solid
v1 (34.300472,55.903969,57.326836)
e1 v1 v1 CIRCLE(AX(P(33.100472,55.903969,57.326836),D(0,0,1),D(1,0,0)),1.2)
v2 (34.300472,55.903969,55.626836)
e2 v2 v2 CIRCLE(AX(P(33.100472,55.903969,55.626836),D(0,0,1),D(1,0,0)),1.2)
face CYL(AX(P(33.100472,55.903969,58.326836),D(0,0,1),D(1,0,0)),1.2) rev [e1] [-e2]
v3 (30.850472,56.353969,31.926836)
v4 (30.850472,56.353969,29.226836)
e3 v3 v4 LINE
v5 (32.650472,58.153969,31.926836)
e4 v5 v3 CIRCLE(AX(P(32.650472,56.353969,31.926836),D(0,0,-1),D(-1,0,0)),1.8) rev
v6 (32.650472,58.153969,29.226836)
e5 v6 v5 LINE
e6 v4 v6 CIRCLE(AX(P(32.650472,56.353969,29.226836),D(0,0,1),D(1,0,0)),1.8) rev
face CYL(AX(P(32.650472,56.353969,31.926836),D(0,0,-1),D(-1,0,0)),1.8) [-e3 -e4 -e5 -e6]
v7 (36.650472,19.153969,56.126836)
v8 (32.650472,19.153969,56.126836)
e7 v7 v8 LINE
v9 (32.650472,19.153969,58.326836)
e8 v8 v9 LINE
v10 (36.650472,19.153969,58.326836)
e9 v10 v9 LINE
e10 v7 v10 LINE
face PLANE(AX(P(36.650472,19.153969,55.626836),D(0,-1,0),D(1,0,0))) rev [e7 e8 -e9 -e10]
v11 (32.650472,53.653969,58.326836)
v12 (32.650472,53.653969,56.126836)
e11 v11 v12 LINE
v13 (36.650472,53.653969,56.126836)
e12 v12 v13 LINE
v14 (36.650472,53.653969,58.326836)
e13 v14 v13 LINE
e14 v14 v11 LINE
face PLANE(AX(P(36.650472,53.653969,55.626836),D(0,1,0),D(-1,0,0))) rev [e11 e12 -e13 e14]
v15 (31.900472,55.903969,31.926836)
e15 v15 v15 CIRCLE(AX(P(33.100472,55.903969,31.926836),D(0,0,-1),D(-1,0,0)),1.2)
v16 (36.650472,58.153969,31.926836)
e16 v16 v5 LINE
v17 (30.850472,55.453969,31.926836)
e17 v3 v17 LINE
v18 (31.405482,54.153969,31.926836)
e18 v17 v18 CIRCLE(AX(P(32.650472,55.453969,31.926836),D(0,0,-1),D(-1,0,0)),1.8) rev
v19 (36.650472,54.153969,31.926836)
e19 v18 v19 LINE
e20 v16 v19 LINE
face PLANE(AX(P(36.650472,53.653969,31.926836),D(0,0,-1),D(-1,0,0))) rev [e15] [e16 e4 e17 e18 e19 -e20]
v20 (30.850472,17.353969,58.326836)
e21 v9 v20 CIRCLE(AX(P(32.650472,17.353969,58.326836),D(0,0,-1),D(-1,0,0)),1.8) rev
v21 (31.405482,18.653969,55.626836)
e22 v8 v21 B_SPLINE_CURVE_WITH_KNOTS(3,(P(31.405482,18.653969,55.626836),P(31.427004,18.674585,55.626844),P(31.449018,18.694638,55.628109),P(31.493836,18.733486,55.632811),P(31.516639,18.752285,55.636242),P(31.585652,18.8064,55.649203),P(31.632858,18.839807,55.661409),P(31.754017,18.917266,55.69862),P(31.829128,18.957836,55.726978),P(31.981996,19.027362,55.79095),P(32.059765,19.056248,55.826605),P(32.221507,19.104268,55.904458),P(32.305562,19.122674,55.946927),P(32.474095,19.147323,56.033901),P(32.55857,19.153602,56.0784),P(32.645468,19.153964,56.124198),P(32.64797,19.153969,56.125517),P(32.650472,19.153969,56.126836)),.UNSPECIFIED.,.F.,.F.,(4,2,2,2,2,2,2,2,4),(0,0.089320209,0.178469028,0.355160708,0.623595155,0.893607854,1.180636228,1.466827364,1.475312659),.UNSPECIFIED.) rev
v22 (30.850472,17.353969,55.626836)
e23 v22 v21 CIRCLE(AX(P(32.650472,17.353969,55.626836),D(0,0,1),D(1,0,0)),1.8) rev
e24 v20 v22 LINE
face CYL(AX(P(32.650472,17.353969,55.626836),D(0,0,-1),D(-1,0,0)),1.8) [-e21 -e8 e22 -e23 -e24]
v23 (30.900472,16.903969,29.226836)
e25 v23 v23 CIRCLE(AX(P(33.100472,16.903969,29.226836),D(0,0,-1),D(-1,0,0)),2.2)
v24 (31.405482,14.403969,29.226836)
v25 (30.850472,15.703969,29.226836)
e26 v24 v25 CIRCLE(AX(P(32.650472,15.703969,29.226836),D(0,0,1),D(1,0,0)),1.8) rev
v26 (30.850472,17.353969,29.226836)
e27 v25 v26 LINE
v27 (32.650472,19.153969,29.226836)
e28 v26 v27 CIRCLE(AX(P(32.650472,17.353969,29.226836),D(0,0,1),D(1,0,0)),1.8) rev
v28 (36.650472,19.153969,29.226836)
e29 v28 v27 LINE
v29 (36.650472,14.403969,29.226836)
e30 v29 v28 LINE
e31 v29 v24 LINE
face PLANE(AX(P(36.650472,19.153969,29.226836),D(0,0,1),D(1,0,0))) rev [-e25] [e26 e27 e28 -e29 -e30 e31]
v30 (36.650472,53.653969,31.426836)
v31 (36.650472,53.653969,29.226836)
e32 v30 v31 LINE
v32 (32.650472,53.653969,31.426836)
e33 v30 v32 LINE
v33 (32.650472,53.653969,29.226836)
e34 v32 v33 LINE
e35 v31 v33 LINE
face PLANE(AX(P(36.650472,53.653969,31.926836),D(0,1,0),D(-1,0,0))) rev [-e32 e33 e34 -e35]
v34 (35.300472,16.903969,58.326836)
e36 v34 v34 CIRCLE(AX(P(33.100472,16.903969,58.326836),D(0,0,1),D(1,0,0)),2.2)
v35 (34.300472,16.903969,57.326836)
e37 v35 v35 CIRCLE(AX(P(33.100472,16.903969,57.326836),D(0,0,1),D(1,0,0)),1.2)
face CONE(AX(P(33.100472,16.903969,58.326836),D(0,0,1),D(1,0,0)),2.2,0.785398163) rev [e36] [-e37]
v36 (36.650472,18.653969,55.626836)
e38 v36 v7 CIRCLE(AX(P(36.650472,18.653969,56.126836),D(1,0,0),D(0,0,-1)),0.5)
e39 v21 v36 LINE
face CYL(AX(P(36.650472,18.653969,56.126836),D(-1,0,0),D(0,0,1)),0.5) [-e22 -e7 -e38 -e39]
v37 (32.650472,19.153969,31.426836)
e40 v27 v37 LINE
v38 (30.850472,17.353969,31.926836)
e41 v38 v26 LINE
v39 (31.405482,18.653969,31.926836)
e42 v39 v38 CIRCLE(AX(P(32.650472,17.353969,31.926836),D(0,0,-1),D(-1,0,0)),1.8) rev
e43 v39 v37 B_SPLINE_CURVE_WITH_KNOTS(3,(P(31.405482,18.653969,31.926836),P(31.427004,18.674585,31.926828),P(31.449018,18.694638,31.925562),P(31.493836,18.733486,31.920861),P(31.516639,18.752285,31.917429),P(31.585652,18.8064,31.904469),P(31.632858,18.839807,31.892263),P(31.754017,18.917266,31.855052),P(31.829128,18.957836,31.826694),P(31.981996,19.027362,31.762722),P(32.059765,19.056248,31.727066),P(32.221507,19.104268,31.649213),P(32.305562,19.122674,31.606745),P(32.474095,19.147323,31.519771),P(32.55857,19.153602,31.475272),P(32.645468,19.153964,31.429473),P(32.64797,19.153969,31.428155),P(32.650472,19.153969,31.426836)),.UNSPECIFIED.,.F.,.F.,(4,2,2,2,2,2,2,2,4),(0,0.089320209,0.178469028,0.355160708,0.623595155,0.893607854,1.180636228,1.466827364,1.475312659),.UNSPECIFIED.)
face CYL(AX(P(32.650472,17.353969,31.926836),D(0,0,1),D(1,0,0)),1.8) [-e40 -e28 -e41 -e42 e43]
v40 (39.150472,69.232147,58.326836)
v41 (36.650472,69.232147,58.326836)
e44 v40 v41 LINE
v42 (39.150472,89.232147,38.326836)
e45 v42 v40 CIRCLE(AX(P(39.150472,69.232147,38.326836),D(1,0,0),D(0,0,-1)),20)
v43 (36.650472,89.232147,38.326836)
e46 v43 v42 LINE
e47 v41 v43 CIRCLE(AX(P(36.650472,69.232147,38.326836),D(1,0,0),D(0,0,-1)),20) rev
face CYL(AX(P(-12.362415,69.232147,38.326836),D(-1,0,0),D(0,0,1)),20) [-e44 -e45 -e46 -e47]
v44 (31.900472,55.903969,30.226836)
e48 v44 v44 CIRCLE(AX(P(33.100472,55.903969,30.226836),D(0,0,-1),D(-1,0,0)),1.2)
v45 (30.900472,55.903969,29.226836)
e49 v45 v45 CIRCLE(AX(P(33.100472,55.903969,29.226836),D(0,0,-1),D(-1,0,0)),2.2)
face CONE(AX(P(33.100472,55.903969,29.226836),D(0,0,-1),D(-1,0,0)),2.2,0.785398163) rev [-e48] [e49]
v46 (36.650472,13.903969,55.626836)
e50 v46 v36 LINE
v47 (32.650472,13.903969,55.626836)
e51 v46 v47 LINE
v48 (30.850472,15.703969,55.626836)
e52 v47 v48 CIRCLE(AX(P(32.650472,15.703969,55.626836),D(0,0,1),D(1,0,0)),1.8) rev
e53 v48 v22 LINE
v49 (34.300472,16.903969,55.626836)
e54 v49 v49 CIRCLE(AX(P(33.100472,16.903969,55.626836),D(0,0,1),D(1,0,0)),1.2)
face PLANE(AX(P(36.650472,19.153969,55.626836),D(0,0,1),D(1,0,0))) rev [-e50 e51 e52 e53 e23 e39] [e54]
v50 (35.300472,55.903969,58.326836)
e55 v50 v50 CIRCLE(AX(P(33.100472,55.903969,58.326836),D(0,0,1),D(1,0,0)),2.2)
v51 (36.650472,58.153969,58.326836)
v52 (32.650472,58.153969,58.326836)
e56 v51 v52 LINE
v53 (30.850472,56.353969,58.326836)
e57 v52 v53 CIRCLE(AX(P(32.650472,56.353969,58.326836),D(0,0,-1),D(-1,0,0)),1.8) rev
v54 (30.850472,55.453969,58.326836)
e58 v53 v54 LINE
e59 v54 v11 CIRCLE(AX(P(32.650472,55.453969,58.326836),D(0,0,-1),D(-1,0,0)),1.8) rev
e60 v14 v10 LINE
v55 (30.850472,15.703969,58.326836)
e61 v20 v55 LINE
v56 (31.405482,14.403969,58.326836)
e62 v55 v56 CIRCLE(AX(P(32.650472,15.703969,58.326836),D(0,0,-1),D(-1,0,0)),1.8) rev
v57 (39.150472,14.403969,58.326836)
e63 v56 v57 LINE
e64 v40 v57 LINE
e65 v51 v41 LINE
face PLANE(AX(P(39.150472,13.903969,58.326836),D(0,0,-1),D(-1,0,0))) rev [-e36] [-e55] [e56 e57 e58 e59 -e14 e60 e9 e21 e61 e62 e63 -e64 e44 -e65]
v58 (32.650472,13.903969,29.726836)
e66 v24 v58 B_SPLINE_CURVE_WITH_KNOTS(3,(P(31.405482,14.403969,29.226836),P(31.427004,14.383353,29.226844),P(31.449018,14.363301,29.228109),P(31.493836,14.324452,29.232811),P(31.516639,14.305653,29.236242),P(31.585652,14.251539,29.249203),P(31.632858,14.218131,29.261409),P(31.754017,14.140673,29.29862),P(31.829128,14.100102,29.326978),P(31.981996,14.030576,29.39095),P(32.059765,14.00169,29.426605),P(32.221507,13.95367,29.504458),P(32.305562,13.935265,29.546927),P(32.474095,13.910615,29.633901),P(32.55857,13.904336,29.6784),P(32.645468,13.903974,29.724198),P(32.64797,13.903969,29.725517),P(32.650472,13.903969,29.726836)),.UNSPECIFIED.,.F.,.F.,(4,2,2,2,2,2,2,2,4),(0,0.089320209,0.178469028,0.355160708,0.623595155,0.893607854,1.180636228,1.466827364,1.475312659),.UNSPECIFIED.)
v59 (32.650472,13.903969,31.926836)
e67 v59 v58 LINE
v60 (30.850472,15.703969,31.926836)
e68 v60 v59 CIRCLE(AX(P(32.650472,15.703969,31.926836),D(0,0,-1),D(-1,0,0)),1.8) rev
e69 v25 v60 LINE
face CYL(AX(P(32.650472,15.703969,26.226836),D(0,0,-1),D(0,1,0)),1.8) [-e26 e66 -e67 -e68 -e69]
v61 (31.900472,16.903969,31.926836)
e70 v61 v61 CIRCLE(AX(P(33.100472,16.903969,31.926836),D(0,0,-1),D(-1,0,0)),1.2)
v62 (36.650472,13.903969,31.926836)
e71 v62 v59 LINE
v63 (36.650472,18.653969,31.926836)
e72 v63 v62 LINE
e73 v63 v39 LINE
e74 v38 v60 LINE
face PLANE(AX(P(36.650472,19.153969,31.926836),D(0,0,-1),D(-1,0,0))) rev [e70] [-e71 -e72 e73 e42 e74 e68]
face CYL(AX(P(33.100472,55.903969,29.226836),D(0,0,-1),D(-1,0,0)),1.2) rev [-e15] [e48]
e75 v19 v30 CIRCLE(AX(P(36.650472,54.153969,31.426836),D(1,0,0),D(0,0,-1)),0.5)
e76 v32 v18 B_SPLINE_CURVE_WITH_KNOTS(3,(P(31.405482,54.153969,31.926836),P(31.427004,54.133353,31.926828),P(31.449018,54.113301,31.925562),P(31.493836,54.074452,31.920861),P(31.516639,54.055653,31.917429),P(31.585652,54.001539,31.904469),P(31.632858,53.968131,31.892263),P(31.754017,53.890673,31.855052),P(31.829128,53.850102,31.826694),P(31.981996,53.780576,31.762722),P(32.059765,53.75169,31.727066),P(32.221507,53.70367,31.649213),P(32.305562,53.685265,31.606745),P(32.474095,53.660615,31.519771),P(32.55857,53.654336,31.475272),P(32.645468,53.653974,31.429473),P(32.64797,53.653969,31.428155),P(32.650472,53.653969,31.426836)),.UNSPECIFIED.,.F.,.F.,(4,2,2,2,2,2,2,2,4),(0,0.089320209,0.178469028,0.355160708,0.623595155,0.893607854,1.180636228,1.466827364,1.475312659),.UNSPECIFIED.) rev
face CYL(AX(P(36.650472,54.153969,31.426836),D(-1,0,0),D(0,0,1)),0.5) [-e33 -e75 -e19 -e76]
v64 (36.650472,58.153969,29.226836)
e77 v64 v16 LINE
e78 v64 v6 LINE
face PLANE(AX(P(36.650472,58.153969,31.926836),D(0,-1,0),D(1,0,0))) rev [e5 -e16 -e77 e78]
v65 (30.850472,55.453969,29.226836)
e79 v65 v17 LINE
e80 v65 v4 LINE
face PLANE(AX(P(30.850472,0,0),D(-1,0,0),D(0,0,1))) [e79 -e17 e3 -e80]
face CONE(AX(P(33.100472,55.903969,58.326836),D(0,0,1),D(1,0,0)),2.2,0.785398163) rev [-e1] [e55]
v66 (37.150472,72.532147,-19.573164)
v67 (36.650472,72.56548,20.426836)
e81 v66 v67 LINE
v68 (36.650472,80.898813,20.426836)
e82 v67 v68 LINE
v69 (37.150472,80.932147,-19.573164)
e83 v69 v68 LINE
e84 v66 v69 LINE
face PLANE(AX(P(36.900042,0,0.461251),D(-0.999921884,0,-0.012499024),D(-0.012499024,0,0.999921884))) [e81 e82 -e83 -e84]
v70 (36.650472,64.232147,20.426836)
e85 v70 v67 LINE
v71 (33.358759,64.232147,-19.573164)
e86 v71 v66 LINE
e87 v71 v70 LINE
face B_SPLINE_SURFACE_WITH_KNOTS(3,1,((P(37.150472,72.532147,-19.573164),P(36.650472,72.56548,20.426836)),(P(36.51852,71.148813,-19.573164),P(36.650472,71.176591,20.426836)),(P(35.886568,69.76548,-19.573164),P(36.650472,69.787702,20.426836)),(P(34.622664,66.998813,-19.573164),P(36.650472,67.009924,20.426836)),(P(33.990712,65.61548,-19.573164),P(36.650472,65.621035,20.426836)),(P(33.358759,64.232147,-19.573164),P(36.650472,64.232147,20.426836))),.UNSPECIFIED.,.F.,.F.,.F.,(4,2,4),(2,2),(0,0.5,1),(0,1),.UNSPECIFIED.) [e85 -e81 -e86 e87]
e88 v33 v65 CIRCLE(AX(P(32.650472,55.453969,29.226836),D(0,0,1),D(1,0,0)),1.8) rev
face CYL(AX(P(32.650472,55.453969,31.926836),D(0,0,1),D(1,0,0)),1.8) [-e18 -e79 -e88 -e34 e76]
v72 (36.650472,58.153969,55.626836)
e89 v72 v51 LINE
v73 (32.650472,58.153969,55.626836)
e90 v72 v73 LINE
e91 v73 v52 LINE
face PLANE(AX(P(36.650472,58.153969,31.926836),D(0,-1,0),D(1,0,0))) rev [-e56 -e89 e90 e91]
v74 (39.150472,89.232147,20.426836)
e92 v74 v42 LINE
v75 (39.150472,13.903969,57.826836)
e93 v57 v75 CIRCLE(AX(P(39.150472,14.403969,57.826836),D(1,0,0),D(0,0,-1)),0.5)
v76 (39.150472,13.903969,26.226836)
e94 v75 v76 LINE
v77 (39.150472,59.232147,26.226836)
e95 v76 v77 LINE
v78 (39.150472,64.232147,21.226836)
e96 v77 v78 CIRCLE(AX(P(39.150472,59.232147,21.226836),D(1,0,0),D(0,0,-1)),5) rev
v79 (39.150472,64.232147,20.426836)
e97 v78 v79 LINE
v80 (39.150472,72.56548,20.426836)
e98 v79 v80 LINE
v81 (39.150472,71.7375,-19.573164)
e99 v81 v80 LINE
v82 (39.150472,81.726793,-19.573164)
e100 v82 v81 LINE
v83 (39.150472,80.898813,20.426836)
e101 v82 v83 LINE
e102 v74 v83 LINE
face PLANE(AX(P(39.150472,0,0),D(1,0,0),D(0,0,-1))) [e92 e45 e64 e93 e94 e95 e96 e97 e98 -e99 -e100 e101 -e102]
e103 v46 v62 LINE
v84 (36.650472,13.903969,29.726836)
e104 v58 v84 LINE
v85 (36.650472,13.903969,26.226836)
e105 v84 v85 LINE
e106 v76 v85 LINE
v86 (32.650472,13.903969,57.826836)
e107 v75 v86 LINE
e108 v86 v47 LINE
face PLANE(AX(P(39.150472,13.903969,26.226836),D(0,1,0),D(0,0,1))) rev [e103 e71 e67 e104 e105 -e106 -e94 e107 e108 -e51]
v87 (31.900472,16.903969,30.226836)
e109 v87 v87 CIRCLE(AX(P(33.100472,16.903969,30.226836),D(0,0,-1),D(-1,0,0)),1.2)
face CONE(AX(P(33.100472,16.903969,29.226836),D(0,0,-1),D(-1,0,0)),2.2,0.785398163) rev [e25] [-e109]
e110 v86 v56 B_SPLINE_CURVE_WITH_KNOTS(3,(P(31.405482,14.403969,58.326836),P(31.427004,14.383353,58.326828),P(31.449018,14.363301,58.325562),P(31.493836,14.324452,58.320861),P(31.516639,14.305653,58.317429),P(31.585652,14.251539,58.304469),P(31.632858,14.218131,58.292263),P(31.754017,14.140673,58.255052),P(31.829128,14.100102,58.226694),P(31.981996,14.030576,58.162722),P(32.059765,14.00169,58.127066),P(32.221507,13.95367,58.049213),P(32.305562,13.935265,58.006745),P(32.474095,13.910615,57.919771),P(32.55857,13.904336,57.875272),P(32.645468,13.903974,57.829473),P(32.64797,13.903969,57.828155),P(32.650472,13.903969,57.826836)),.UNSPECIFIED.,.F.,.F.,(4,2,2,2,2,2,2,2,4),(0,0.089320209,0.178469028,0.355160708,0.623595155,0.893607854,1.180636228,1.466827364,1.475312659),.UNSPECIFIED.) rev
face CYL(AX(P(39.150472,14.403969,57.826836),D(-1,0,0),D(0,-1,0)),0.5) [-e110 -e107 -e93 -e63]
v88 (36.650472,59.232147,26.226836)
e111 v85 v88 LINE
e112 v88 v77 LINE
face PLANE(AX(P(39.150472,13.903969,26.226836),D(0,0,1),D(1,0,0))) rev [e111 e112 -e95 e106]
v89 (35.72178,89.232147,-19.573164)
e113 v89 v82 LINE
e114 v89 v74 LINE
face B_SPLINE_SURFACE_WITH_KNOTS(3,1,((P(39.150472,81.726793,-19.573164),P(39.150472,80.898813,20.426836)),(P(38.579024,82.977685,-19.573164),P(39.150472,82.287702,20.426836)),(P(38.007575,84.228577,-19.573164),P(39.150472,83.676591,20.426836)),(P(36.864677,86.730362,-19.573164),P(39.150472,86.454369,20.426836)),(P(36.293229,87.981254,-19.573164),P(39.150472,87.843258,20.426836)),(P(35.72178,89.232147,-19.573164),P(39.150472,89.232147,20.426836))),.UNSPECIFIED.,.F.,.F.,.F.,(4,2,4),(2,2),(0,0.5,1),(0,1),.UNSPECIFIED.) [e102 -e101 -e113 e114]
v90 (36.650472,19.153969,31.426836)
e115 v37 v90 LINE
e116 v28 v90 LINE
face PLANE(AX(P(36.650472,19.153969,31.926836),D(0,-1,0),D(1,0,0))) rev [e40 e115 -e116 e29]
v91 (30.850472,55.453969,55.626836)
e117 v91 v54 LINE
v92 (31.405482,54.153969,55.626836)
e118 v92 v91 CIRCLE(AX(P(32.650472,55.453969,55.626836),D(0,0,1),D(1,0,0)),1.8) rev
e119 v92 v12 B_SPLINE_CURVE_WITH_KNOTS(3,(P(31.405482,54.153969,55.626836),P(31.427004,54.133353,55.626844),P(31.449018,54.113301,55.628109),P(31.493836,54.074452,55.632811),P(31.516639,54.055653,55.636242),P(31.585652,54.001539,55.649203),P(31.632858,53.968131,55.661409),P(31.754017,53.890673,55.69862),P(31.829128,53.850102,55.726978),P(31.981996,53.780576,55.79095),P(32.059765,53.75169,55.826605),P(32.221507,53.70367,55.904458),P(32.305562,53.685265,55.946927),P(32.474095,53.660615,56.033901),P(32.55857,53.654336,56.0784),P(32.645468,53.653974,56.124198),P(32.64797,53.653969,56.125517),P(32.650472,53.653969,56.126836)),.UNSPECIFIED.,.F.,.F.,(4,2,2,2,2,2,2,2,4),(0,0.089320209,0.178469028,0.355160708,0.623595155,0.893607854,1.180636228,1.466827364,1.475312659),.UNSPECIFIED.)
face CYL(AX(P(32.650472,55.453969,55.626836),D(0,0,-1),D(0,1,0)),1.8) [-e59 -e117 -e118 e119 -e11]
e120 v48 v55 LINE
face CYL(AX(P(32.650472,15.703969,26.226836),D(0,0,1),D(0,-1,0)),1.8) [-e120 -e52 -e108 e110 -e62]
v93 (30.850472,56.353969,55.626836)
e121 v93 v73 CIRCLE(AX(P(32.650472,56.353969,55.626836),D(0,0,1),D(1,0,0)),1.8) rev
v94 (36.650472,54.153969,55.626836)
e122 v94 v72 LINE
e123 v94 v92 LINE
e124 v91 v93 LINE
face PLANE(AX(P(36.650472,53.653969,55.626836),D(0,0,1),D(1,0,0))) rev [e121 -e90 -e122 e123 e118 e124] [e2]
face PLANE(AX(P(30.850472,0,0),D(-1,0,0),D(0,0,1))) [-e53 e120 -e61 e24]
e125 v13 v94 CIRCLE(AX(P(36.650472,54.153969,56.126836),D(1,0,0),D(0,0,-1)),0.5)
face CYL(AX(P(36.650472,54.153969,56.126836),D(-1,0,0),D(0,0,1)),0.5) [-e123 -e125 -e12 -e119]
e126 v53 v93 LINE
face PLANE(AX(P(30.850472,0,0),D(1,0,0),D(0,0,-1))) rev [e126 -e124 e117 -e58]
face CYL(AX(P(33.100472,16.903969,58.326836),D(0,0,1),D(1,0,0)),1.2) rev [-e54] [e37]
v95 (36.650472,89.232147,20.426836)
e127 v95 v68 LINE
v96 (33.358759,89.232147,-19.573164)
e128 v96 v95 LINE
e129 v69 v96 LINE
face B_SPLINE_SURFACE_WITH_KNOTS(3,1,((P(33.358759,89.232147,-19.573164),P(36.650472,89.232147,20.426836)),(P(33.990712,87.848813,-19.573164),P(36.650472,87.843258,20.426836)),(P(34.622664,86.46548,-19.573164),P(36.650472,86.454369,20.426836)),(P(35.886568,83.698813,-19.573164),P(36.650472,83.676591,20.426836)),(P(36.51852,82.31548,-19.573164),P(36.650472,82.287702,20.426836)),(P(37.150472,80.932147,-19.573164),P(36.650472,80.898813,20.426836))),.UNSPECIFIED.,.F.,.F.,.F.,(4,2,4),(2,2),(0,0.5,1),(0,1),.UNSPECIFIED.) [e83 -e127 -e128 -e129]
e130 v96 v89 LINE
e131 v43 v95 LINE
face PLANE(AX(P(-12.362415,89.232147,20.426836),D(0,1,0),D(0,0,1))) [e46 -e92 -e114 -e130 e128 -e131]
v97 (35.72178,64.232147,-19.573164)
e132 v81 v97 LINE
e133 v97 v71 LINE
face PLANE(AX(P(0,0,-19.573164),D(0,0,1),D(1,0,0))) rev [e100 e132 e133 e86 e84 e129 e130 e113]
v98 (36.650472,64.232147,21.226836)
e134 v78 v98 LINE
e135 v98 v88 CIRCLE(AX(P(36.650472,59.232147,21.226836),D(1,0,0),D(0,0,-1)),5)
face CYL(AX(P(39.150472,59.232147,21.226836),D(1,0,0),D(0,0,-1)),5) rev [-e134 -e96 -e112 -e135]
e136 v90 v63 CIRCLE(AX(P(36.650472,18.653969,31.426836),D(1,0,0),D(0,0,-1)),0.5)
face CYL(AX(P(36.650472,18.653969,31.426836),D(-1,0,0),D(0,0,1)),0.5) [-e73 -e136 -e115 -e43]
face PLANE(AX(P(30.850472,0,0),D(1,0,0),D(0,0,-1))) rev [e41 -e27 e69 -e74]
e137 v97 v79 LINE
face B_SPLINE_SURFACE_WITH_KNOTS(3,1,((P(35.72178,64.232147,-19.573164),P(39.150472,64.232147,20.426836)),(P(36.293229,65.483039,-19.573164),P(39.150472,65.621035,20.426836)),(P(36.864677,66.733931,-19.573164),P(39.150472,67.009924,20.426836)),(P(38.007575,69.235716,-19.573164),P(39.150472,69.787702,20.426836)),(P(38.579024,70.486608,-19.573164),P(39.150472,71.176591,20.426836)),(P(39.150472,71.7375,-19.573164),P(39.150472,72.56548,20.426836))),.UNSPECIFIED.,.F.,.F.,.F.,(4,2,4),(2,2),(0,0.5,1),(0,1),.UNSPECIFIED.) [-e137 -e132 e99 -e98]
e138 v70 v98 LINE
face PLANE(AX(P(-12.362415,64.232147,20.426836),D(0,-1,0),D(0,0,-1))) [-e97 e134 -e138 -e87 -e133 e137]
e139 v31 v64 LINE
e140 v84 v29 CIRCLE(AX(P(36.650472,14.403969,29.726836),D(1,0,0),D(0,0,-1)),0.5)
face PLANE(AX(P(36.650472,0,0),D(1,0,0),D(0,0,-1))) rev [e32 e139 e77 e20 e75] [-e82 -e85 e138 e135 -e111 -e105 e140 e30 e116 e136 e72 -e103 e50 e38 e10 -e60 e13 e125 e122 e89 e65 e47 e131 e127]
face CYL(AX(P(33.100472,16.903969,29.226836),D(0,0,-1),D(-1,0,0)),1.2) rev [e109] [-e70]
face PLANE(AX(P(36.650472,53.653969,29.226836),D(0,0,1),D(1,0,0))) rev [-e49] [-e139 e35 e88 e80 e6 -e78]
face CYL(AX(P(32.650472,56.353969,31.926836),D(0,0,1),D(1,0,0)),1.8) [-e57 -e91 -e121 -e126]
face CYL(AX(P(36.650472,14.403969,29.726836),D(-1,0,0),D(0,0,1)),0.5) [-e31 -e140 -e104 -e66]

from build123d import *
from OCP.BRepFilletAPI import BRepFilletAPI_MakeFillet

# Parameters (mm, degrees)
BOSS_EXTRUDE1_START                                 = 0.25
SKETCH1_W                                           = 2.7
SKETCH1_H                                           = 4.5
BOSS_EXTRUDE1_DEPTH                                 = 5.8
SKETCH1_H_2                                         = 5.25
BOSS_EXTRUDE1_2_DEPTH                               = 5.8
BOSS_EXTRUDE1_3_DEPTH                               = 5.8
BOSS_EXTRUDE1_4_DEPTH                               = 5.8
SKETCH2_W                                           = 32.1
SKETCH2_H                                           = 44.25
BOSS_EXTRUDE2_DEPTH                                 = 2.5
BOSS_EXTRUDE3_DEPTH                                 = 2.5
CSK_FOR_M2_COUNTERSUNK_FLAT_HEAD_SCREW1_D           = 2.4
CSK_FOR_M2_COUNTERSUNK_FLAT_HEAD_SCREW1_DEPTH       = 4
CSK_FOR_M2_COUNTERSUNK_FLAT_HEAD_SCREW1_CSINK_D     = 4.4
CSK_FOR_M2_COUNTERSUNK_FLAT_HEAD_SCREW1_CSINK_ANGLE = 90
CSK_FOR_M2_COUNTERSUNK_FLAT_HEAD_SCREW1_TIP         = 0.721032743
CSK_FOR_M2_COUNTERSUNK_FLAT_HEAD_SCREW2_D           = 2.4
CSK_FOR_M2_COUNTERSUNK_FLAT_HEAD_SCREW2_DEPTH       = 4
CSK_FOR_M2_COUNTERSUNK_FLAT_HEAD_SCREW2_CSINK_D     = 4.4
CSK_FOR_M2_COUNTERSUNK_FLAT_HEAD_SCREW2_CSINK_ANGLE = 90
CSK_FOR_M2_COUNTERSUNK_FLAT_HEAD_SCREW2_TIP         = 0.721032743
FILLET1_R1                                          = 20
FILLET1_R2                                          = 5
FILLET2_R                                           = 1.8
FILLET3_R                                           = 0.5


with BuildPart() as part:
    # Sketch1 → Boss-Extrude1 (new body)
    with BuildSketch(Plane(origin=(30.600472417, 0, 0), x_dir=(0, 0, -1), z_dir=(1, 0, 0)).offset(BOSS_EXTRUDE1_START)):
        with Locations((-30.576835801, 55.903969126)):
            Rectangle(SKETCH1_W, SKETCH1_H)
    extrude(amount=BOSS_EXTRUDE1_DEPTH)



with BuildPart() as body_2:
    # Sketch1 → Boss-Extrude1 2 (new body)
    with BuildSketch(Plane(origin=(30.600472417, 0, 0), x_dir=(0, 0, -1), z_dir=(1, 0, 0)).offset(BOSS_EXTRUDE1_START)):
        with Locations((-30.576835801, 16.528969126)):
            Rectangle(SKETCH1_W, SKETCH1_H_2)
    extrude(amount=BOSS_EXTRUDE1_2_DEPTH)


with BuildPart() as body_3:
    # Sketch1 → Boss-Extrude1 3 (new body)
    with BuildSketch(Plane(origin=(30.600472417, 0, 0), x_dir=(0, 0, -1), z_dir=(1, 0, 0)).offset(BOSS_EXTRUDE1_START)):
        with Locations((-56.976835801, 16.528969126)):
            Rectangle(SKETCH1_W, SKETCH1_H_2)
    extrude(amount=BOSS_EXTRUDE1_3_DEPTH)


with BuildPart() as body_4:
    # Sketch1 → Boss-Extrude1 4 (new body)
    with BuildSketch(Plane(origin=(30.600472417, 0, 0), x_dir=(0, 0, -1), z_dir=(1, 0, 0)).offset(BOSS_EXTRUDE1_START)):
        with Locations((-56.976835801, 55.903969126)):
            Rectangle(SKETCH1_W, SKETCH1_H)
    extrude(amount=BOSS_EXTRUDE1_4_DEPTH)


with BuildPart() as part_1:
    add(part.part)

    add(body_2.part)  # Boss-Extrude2 merges body 2

    add(body_3.part)  # Boss-Extrude2 merges body 3

    add(body_4.part)  # Boss-Extrude2 merges body 4
    # Sketch2 → Boss-Extrude2 (add)
    with BuildSketch(Plane(origin=(36.650472417, 0, 0), x_dir=(0, 0, -1), z_dir=(1, 0, 0))):
        with Locations((-42.276835801, 36.028969126)):
            Rectangle(SKETCH2_W, SKETCH2_H)
    extrude(amount=BOSS_EXTRUDE2_DEPTH)

    # Sketch3 → Boss-Extrude3 (add)
    with BuildSketch(Plane(origin=(39.150472417, 0, 0), x_dir=(0, 0, -1), z_dir=(1, 0, 0))):
        Polygon((-20.426835801, 89.232146542), (-58.326835801, 89.232146542), (-58.326835801, 58.153969126), (-26.226835801, 58.153969126), (-26.226835801, 64.232146542), (-20.426835801, 64.232146542), align=None)
    extrude(amount=-BOSS_EXTRUDE3_DEPTH)

    # CSK for M2 Countersunk Flat Head Screw1
    with Locations(Plane.XY.offset(58.326835801)):
        with Locations((33.100472417, 55.903969126), (33.100472417, 16.903969126)):
            CounterSinkHole(CSK_FOR_M2_COUNTERSUNK_FLAT_HEAD_SCREW1_D / 2, CSK_FOR_M2_COUNTERSUNK_FLAT_HEAD_SCREW1_CSINK_D / 2, depth=CSK_FOR_M2_COUNTERSUNK_FLAT_HEAD_SCREW1_DEPTH, counter_sink_angle=CSK_FOR_M2_COUNTERSUNK_FLAT_HEAD_SCREW1_CSINK_ANGLE)
            with Locations((0, 0, -(CSK_FOR_M2_COUNTERSUNK_FLAT_HEAD_SCREW1_DEPTH + CSK_FOR_M2_COUNTERSUNK_FLAT_HEAD_SCREW1_TIP / 2))):  # 118° drill point
                Cone(0, CSK_FOR_M2_COUNTERSUNK_FLAT_HEAD_SCREW1_D / 2, CSK_FOR_M2_COUNTERSUNK_FLAT_HEAD_SCREW1_TIP, mode=Mode.SUBTRACT)

    # CSK for M2 Countersunk Flat Head Screw2
    with Locations(Plane(origin=(0, 0, 29.226835801), x_dir=(-1, 0, 0), z_dir=(0, 0, -1))):
        with Locations((-33.100472417, 55.903969126), (-33.100472417, 16.903969126)):
            CounterSinkHole(CSK_FOR_M2_COUNTERSUNK_FLAT_HEAD_SCREW2_D / 2, CSK_FOR_M2_COUNTERSUNK_FLAT_HEAD_SCREW2_CSINK_D / 2, depth=CSK_FOR_M2_COUNTERSUNK_FLAT_HEAD_SCREW2_DEPTH, counter_sink_angle=CSK_FOR_M2_COUNTERSUNK_FLAT_HEAD_SCREW2_CSINK_ANGLE)
            with Locations((0, 0, -(CSK_FOR_M2_COUNTERSUNK_FLAT_HEAD_SCREW2_DEPTH + CSK_FOR_M2_COUNTERSUNK_FLAT_HEAD_SCREW2_TIP / 2))):  # 118° drill point
                Cone(0, CSK_FOR_M2_COUNTERSUNK_FLAT_HEAD_SCREW2_D / 2, CSK_FOR_M2_COUNTERSUNK_FLAT_HEAD_SCREW2_TIP, mode=Mode.SUBTRACT)

    # Fillet1: one fillet with a radius per group of edges: ONE call of the kernel's fillet builder (fillet() takes one radius for all edges)
    fillet1_edges_1 = [part_1.edges().sort_by_distance(p)[0] for p in [
        (37.900472417, 89.232146542, 58.326835801),
    ]]
    fillet1_edges_2 = [part_1.edges().sort_by_distance(p)[0] for p in [
        (37.900472417, 64.232146542, 26.226835801),
    ]]
    fillet1 = BRepFilletAPI_MakeFillet(part_1.part.solid().wrapped)
    for e in fillet1_edges_1:
        fillet1.Add(FILLET1_R1, e.wrapped)
    for e in fillet1_edges_2:
        fillet1.Add(FILLET1_R2, e.wrapped)
    add(Compound.cast(fillet1.Shape()), mode=Mode.REPLACE)

    # Loft1: read off the stored shape, not the designer's step
    # Loft1: loft between two sections, ruled curve by curve
    loft1_from = [
        Edge.make_bspline([(39.150472417, 81.726792839, -19.573164199), (38.579023668, 82.977685123, -19.573164199), (38.007574919, 84.228577407, -19.573164199), (36.864677421, 86.730361975, -19.573164199), (36.293228672, 87.981254258, -19.573164199), (35.721779923, 89.232146542, -19.573164199)], [0, 0, 0, 0, 0.5, 0.5, 1, 1, 1, 1], 3),
        Edge.make_bspline([(33.358759351, 89.232146542, -19.573164199), (33.990711529, 87.848813209, -19.573164199), (34.622663707, 86.465479876, -19.573164199), (35.886568062, 83.698813209, -19.573164199), (36.51852024, 82.315479876, -19.573164199), (37.150472417, 80.932146542, -19.573164199)], [0, 0, 0, 0, 0.5, 0.5, 1, 1, 1, 1], 3),
        Edge.make_bspline([(37.150472417, 72.532146542, -19.573164199), (36.51852024, 71.148813209, -19.573164199), (35.886568062, 69.765479876, -19.573164199), (34.622663707, 66.998813209, -19.573164199), (33.990711529, 65.615479876, -19.573164199), (33.358759351, 64.232146542, -19.573164199)], [0, 0, 0, 0, 0.5, 0.5, 1, 1, 1, 1], 3),
        Edge.make_bspline([(35.721779923, 64.232146542, -19.573164199), (36.293228672, 65.483038826, -19.573164199), (36.864677421, 66.73393111, -19.573164199), (38.007574919, 69.235715678, -19.573164199), (38.579023668, 70.486607962, -19.573164199), (39.150472417, 71.737500246, -19.573164199)], [0, 0, 0, 0, 0.5, 0.5, 1, 1, 1, 1], 3),
        Edge.make_line((37.150472417, 72.532146542, -19.573164199), (37.150472417, 80.932146542, -19.573164199)),
        Edge.make_line((33.358759351, 89.232146542, -19.573164199), (35.721779923, 89.232146542, -19.573164199)),
        Edge.make_line((35.721779923, 64.232146542, -19.573164199), (33.358759351, 64.232146542, -19.573164199)),
        Edge.make_line((39.150472417, 71.737500246, -19.573164199), (39.150472417, 81.726792839, -19.573164199)),
    ]
    loft1_to = [
        Edge.make_bspline([(39.150472417, 80.898813209, 20.426835801), (39.150472417, 82.287702098, 20.426835801), (39.150472417, 83.676590987, 20.426835801), (39.150472417, 86.454368765, 20.426835801), (39.150472417, 87.843257653, 20.426835801), (39.150472417, 89.232146542, 20.426835801)], [0, 0, 0, 0, 0.5, 0.5, 1, 1, 1, 1], 3),
        Edge.make_bspline([(36.650472417, 89.232146542, 20.426835801), (36.650472417, 87.843257653, 20.426835801), (36.650472417, 86.454368765, 20.426835801), (36.650472417, 83.676590987, 20.426835801), (36.650472417, 82.287702098, 20.426835801), (36.650472417, 80.898813209, 20.426835801)], [0, 0, 0, 0, 0.5, 0.5, 1, 1, 1, 1], 3),
        Edge.make_bspline([(36.650472417, 72.565479876, 20.426835801), (36.650472417, 71.176590987, 20.426835801), (36.650472417, 69.787702098, 20.426835801), (36.650472417, 67.00992432, 20.426835801), (36.650472417, 65.621035431, 20.426835801), (36.650472417, 64.232146542, 20.426835801)], [0, 0, 0, 0, 0.5, 0.5, 1, 1, 1, 1], 3),
        Edge.make_bspline([(39.150472417, 64.232146542, 20.426835801), (39.150472417, 65.621035431, 20.426835801), (39.150472417, 67.00992432, 20.426835801), (39.150472417, 69.787702098, 20.426835801), (39.150472417, 71.176590987, 20.426835801), (39.150472417, 72.565479876, 20.426835801)], [0, 0, 0, 0, 0.5, 0.5, 1, 1, 1, 1], 3),
        Edge.make_line((36.650472417, 72.565479876, 20.426835801), (36.650472417, 80.898813209, 20.426835801)),
        Edge.make_line((36.650472417, 89.232146542, 20.426835801), (39.150472417, 89.232146542, 20.426835801)),
        Edge.make_line((39.150472417, 64.232146542, 20.426835801), (36.650472417, 64.232146542, 20.426835801)),
        Edge.make_line((39.150472417, 72.565479876, 20.426835801), (39.150472417, 80.898813209, 20.426835801)),
    ]
    loft1 = Solid(Shell([*[Face.make_surface_from_curves(loft1_from[k], loft1_to[k]) for k in range(8)], Face(Wire(loft1_from)), Face(Wire(loft1_to))]))
    add(loft1)

    # Fillet2
    fillet2_edges = [part_1.edges().sort_by_distance(p)[0] for p in [
        (30.850472417, 58.153969126, 30.576835801),
        (30.850472417, 13.903969126, 30.576835801),
        (30.850472417, 53.653969126, 30.576835801),
        (30.850472417, 19.153969126, 30.576835801),
        (30.850472417, 19.153969126, 56.976835801),
        (30.850472417, 13.903969126, 56.976835801),
        (30.850472417, 58.153969126, 56.976835801),
        (30.850472417, 53.653969126, 56.976835801),
    ]]
    fillet(fillet2_edges, radius=FILLET2_R)

    # Fillet3
    # the kernel refuses this fillet: 0.5 mm, written as the material it takes off along each edge
    with BuildSketch(Plane(origin=(40.400472417, 13.903969126, 58.326835801), x_dir=(0, 1, 0), z_dir=(-1, 0, 0))) as fillet3_piece_1:
        with BuildLine():
            CenterArc((FILLET3_R, FILLET3_R), FILLET3_R, 180, 90)
            Line((0, FILLET3_R), (0, 0))
            Line((0, 0), (FILLET3_R, 0))
        make_face()
    extrude(amount=9, mode=Mode.SUBTRACT)
    with BuildSketch(Plane(origin=(31.400472417, 19.153969126, 31.926835801), x_dir=(0, -1, 0), z_dir=(1, 0, 0)), Plane(origin=(31.400472417, 19.153969126, 55.626835801), x_dir=(0, 0, 1), z_dir=(1, 0, 0)), Plane(origin=(31.400472417, 53.653969126, 31.926835801), x_dir=(0, 0, -1), z_dir=(1, 0, 0))) as fillet3_piece_2:
        with BuildLine():
            CenterArc((FILLET3_R, FILLET3_R), FILLET3_R, 180, 90)
            Line((0, FILLET3_R), (0, 0))
            Line((0, 0), (FILLET3_R, 0))
        make_face()
    extrude(amount=5.25, mode=Mode.SUBTRACT)
    with BuildSketch(Plane(origin=(31.400472417, 13.903969126, 29.226835801), x_dir=(0, 0, 1), z_dir=(1, 0, 0)), Plane(origin=(31.400472417, 53.653969126, 55.626835801), x_dir=(0, 0, 1), z_dir=(1, 0, 0))) as fillet3_piece_3:
        with BuildLine():
            CenterArc((FILLET3_R, -FILLET3_R), FILLET3_R, 90, 90)
            Line((0, -FILLET3_R), (0, 0))
            Line((0, 0), (FILLET3_R, 0))
        make_face()
    extrude(amount=5.25, mode=Mode.SUBTRACT)


solid = part_1.part
